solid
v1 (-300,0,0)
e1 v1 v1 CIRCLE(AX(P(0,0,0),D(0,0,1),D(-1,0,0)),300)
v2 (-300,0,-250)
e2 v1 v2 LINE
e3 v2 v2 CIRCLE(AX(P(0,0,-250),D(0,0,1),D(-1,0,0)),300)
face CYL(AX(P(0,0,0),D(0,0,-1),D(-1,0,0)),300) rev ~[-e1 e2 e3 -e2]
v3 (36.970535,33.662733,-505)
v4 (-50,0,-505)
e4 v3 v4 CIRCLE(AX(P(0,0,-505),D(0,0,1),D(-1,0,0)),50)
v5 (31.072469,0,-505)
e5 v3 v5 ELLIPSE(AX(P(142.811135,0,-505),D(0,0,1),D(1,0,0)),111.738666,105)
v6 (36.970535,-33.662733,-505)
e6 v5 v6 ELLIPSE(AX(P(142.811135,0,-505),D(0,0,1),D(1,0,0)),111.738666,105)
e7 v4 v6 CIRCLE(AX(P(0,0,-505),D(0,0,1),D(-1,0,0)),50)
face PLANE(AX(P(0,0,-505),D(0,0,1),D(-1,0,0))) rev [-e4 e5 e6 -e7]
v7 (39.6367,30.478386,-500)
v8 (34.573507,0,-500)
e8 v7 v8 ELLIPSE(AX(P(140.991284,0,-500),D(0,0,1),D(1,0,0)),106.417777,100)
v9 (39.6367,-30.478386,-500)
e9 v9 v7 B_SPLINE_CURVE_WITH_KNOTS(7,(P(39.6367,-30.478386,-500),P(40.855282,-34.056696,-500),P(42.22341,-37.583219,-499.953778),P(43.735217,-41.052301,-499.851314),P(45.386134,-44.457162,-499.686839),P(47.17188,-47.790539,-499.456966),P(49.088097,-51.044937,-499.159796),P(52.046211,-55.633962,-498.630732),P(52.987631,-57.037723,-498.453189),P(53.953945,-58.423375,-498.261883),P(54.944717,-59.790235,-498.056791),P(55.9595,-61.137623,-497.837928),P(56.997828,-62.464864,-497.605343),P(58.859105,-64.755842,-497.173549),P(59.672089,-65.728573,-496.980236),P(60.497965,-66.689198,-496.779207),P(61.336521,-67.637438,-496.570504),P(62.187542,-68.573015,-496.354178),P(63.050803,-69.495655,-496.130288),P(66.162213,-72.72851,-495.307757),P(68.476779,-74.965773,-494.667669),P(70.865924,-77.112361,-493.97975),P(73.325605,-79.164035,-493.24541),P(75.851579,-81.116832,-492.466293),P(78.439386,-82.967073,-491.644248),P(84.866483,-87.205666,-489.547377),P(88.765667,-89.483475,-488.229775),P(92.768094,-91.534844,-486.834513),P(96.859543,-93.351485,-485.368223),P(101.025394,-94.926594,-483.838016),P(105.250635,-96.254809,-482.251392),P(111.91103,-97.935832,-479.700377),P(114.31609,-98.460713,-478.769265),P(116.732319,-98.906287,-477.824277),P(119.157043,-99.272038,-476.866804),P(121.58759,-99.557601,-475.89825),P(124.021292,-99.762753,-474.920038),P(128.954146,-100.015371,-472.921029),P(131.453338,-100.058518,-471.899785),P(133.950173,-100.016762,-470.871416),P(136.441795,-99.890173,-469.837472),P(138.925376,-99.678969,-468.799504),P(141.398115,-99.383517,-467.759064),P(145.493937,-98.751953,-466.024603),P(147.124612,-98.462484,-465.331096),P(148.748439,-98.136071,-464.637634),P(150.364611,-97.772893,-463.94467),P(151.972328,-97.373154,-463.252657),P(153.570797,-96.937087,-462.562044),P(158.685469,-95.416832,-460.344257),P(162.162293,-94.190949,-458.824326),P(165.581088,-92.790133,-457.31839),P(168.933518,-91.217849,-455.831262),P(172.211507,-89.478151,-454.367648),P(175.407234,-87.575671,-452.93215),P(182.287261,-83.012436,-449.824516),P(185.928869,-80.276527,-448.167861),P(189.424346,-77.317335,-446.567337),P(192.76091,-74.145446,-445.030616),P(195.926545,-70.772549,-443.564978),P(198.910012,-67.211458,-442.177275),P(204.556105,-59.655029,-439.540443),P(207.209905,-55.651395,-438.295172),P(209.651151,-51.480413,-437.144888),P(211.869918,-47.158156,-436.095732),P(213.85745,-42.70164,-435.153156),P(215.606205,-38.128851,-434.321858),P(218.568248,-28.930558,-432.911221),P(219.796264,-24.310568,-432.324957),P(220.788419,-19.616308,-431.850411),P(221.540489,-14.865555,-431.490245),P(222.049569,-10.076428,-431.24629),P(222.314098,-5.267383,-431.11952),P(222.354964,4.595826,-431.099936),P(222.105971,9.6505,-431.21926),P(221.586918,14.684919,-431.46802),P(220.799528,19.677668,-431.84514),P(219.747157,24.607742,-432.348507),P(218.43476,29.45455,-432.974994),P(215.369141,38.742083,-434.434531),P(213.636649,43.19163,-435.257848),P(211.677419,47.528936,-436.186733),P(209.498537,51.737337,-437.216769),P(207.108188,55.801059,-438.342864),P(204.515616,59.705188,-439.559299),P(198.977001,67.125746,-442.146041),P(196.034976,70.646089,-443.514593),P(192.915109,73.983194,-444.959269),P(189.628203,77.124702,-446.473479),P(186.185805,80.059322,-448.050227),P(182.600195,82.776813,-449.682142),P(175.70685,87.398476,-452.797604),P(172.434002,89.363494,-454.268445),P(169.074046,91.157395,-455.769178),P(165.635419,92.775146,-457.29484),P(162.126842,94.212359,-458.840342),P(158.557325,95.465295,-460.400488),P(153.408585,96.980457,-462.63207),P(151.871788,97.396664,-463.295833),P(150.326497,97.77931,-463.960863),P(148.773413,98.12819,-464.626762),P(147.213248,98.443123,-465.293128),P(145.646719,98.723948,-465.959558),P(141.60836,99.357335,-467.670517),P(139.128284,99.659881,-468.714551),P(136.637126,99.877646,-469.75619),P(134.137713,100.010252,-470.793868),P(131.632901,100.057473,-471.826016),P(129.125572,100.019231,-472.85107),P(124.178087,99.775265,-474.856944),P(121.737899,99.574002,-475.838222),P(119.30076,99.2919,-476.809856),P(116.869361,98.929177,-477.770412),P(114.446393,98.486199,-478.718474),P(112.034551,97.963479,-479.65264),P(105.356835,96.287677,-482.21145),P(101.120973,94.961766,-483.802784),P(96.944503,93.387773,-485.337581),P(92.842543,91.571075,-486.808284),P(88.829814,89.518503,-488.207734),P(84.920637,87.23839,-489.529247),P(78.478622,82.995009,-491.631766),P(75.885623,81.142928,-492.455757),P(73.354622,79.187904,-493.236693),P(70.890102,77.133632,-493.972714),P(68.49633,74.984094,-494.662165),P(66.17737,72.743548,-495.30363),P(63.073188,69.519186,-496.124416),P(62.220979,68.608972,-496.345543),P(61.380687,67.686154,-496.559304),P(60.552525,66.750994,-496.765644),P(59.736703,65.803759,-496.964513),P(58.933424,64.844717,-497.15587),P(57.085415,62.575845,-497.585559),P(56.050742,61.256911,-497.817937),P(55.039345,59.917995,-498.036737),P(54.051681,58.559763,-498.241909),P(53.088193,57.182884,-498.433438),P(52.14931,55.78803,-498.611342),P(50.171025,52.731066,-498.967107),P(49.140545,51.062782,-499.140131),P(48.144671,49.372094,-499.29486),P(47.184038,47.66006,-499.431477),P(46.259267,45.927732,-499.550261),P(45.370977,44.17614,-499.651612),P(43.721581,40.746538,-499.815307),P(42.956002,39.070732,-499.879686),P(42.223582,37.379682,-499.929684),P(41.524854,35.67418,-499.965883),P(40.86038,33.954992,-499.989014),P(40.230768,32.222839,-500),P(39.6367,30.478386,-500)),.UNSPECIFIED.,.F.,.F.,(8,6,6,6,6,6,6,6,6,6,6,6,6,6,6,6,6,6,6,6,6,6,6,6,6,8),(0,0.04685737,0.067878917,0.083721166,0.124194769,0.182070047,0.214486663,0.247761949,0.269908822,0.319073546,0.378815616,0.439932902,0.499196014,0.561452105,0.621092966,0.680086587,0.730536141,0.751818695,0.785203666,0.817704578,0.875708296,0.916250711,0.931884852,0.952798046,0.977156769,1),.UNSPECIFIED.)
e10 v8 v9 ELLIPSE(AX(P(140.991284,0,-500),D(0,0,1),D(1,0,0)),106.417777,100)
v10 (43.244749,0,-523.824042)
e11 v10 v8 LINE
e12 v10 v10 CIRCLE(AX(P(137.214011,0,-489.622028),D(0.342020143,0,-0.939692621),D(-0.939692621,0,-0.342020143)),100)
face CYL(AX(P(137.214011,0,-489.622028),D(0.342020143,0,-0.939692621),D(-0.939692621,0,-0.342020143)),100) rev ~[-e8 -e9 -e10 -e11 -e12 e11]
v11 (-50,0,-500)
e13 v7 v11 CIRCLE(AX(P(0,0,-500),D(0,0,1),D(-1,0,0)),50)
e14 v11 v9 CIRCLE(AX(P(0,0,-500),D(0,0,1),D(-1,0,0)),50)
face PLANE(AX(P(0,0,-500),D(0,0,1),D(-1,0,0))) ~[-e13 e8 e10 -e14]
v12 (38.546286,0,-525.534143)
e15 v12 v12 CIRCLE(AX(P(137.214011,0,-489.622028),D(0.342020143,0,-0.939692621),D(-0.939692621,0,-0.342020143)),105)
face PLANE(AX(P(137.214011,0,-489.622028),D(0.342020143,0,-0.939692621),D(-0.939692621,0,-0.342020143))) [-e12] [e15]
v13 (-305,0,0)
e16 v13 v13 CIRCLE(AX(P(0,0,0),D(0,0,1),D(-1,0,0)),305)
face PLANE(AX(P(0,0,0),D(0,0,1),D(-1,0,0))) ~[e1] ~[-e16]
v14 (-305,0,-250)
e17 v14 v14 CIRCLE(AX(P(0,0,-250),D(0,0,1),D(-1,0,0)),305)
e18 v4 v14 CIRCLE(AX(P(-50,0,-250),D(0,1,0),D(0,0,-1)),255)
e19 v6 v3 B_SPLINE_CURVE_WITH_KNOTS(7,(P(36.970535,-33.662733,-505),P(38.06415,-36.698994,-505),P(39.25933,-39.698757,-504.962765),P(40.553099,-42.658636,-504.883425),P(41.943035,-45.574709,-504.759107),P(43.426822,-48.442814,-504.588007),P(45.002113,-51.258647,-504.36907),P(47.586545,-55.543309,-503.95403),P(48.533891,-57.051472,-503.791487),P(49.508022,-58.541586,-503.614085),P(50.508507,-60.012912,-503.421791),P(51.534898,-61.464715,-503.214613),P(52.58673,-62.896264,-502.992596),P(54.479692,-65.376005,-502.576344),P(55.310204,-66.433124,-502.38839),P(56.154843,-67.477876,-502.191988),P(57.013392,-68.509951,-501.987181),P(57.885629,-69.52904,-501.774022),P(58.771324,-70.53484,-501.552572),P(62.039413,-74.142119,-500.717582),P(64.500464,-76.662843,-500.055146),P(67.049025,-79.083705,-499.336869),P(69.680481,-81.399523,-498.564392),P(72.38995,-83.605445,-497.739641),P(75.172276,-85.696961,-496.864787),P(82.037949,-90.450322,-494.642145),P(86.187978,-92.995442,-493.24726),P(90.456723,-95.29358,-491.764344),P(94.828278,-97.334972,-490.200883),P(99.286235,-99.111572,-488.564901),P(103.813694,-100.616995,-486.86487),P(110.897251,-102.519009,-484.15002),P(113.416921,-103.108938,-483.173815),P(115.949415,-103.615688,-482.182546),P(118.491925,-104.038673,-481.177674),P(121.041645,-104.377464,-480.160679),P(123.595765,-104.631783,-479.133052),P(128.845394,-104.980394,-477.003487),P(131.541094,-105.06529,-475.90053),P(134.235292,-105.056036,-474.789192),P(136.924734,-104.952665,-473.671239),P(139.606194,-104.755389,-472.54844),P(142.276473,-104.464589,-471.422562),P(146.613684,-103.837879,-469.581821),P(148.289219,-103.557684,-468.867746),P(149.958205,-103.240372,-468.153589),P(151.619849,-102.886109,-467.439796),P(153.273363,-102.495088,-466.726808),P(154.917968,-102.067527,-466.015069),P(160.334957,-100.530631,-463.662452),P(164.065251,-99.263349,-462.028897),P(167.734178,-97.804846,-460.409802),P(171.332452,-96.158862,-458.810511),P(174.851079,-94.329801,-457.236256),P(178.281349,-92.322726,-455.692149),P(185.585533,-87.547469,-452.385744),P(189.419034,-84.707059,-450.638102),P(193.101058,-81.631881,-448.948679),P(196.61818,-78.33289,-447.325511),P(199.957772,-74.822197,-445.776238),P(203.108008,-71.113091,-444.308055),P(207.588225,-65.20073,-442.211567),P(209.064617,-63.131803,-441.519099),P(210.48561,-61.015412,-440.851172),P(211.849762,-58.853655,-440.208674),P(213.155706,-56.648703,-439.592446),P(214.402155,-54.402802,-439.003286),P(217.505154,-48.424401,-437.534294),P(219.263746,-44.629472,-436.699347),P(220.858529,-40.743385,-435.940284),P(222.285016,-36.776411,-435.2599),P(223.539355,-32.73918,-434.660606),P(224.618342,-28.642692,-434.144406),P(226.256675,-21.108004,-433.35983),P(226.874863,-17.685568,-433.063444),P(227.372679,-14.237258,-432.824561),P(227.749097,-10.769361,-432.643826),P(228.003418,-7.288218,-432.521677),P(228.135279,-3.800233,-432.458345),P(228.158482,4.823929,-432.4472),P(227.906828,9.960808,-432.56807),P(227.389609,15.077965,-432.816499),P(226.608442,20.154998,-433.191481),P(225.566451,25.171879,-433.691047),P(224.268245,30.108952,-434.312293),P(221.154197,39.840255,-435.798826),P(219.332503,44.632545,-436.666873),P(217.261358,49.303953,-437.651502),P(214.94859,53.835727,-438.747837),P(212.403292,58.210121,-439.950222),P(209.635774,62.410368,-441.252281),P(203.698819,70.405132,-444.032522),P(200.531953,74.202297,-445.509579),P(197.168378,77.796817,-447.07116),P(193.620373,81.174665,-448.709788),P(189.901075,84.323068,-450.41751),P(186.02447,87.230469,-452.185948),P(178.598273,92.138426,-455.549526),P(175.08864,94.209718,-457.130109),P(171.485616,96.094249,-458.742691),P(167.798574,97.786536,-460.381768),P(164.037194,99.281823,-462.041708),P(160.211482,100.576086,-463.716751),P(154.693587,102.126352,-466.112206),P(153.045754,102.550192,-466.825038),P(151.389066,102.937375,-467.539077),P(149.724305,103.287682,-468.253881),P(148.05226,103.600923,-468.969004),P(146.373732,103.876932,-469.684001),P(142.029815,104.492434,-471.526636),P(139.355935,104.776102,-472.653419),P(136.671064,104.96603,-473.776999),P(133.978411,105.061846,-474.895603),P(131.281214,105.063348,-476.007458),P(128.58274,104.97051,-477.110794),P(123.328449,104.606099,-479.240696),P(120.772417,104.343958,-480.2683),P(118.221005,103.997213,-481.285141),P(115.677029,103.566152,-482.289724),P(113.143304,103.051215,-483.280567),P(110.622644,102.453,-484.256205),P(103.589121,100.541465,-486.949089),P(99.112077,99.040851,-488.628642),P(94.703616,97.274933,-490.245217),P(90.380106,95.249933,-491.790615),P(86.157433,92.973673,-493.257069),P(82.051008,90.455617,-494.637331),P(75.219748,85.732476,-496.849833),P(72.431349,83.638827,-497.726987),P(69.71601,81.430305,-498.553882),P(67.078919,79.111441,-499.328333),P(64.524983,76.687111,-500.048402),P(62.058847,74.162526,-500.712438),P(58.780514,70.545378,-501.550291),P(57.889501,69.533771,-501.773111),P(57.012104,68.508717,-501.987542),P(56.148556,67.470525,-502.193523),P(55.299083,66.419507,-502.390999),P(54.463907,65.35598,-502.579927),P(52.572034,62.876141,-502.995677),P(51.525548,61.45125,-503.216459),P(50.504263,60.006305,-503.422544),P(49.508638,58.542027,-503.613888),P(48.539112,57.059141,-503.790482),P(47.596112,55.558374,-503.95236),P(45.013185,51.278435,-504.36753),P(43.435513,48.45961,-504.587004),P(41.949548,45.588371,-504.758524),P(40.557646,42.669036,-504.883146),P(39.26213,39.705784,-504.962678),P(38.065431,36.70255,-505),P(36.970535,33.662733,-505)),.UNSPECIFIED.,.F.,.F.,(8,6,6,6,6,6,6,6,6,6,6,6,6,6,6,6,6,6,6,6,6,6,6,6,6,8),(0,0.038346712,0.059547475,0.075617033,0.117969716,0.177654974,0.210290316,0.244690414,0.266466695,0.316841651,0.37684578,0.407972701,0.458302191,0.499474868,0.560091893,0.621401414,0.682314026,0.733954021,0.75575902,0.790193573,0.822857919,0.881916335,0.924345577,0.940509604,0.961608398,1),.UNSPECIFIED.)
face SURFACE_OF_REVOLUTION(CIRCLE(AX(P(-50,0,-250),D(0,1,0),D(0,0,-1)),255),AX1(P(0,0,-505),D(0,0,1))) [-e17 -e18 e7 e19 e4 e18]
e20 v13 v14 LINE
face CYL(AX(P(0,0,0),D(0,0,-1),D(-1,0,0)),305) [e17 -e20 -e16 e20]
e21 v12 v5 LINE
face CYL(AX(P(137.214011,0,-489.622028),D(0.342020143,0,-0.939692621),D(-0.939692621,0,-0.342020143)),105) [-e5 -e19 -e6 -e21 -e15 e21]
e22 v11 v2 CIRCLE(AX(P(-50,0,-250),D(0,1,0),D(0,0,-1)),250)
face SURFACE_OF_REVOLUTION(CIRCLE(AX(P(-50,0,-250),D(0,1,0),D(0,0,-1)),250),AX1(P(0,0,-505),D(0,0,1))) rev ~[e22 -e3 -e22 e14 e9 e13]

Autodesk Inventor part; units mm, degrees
ref_plane "YZ Plane" through (0, 0, 0) normal (1, 0, 0) x (0, 1, 0)
ref_plane "XZ Plane" through (0, 0, 0) normal (0, 1, 0) x (-1, 0, 0)
ref_plane "XY Plane" through (0, 0, 0) normal (0, 0, 1) x (1, 0, 0)
sketch "Skizze1" plane through (0, 0, 0) normal (0, 1, 0) x (-1, 0, 0)
  line L0 (0, -493.487354) -> (0, 702.145893)
  line L1 (0, -500) -> (50, -500)
  line L2 (300, 0) -> (300, -250)
  arc A0 (50, -500) -> (300, -250) centre (50, -250) ccw
  line L3 (300, 0) -> (305, 0)
  line L4 (305, 0) -> (305, -250)
  line L5 (0, -500) -> (0, -505)
  line L6 (0, -505) -> (50, -505)
  arc A1 (50, -505) -> (305, -250) centre (50, -250) ccw
  point P0 (0, 0)
  dimension "d0" = 0
  dimension "d1" = 600
  dimension "d2" = 50
  dimension "d3" = 500
  dimension "d4" = 5
  dimension "d5" = 5
  dimension "d6" = 50
revolve "Umdrehung1" add sketch "Skizze1" angle 360 about axis through (0, 0, -493.487354) along (0, 0, 1)
sketch "Skizze2" plane through (0, 0, 0) normal (0, 1, 0) x (-1, 0, 0)
  line L0 (-305, -250) -> (305, -250)
  line L1 (-50, -505) -> (50, -505)
  arc A0 (-305, -250) -> (-50, -505) centre (-50, -250) ccw
  line L2 (-101.948734, -499.652416) -> (-102.850213, -502.129245)
  line L3 (-102.850213, -502.129245) -> (-187.422693, -471.347829)
  line L4 (-187.422693, -471.347829) -> (-185.486683, -466.028607)
  point P0 (0, 0)
  point P1 (-137.214011, -489.622028)
  dimension "d8" = 90
extrude "Extrusion1" add sketch "Skizze2" along normal blind 10
sketch "Skizze3" plane through (137.214011, 0, -489.622028) normal (0.3420157, 0, -0.9396942) x (-0.9396942, 0, -0.3420157)
  line L0 (-53.430873, 0) -> (0, 0)
  circle A0 centre (0, 0) radius 105
  point P0 (-38.519221, 0)
  dimension "d12" = 210
extrude "Extrusion2" add sketch "Skizze3" against normal up to surface
sketch "Skizze4" plane through (137.214011, 0, -489.622028) normal (0.3420157, 0, -0.9396942) x (-0.9396942, 0, -0.3420157)
  circle A0 centre (0, 0) radius 100
  point P0 (-38.519221, 0)
  dimension "d15" = 200
extrude "Extrusion3" cut sketch "Skizze4" against normal through all
equation "\"d5\" = d4"
equation "\"d6\" = d2"
properties part number "Tank_3"
